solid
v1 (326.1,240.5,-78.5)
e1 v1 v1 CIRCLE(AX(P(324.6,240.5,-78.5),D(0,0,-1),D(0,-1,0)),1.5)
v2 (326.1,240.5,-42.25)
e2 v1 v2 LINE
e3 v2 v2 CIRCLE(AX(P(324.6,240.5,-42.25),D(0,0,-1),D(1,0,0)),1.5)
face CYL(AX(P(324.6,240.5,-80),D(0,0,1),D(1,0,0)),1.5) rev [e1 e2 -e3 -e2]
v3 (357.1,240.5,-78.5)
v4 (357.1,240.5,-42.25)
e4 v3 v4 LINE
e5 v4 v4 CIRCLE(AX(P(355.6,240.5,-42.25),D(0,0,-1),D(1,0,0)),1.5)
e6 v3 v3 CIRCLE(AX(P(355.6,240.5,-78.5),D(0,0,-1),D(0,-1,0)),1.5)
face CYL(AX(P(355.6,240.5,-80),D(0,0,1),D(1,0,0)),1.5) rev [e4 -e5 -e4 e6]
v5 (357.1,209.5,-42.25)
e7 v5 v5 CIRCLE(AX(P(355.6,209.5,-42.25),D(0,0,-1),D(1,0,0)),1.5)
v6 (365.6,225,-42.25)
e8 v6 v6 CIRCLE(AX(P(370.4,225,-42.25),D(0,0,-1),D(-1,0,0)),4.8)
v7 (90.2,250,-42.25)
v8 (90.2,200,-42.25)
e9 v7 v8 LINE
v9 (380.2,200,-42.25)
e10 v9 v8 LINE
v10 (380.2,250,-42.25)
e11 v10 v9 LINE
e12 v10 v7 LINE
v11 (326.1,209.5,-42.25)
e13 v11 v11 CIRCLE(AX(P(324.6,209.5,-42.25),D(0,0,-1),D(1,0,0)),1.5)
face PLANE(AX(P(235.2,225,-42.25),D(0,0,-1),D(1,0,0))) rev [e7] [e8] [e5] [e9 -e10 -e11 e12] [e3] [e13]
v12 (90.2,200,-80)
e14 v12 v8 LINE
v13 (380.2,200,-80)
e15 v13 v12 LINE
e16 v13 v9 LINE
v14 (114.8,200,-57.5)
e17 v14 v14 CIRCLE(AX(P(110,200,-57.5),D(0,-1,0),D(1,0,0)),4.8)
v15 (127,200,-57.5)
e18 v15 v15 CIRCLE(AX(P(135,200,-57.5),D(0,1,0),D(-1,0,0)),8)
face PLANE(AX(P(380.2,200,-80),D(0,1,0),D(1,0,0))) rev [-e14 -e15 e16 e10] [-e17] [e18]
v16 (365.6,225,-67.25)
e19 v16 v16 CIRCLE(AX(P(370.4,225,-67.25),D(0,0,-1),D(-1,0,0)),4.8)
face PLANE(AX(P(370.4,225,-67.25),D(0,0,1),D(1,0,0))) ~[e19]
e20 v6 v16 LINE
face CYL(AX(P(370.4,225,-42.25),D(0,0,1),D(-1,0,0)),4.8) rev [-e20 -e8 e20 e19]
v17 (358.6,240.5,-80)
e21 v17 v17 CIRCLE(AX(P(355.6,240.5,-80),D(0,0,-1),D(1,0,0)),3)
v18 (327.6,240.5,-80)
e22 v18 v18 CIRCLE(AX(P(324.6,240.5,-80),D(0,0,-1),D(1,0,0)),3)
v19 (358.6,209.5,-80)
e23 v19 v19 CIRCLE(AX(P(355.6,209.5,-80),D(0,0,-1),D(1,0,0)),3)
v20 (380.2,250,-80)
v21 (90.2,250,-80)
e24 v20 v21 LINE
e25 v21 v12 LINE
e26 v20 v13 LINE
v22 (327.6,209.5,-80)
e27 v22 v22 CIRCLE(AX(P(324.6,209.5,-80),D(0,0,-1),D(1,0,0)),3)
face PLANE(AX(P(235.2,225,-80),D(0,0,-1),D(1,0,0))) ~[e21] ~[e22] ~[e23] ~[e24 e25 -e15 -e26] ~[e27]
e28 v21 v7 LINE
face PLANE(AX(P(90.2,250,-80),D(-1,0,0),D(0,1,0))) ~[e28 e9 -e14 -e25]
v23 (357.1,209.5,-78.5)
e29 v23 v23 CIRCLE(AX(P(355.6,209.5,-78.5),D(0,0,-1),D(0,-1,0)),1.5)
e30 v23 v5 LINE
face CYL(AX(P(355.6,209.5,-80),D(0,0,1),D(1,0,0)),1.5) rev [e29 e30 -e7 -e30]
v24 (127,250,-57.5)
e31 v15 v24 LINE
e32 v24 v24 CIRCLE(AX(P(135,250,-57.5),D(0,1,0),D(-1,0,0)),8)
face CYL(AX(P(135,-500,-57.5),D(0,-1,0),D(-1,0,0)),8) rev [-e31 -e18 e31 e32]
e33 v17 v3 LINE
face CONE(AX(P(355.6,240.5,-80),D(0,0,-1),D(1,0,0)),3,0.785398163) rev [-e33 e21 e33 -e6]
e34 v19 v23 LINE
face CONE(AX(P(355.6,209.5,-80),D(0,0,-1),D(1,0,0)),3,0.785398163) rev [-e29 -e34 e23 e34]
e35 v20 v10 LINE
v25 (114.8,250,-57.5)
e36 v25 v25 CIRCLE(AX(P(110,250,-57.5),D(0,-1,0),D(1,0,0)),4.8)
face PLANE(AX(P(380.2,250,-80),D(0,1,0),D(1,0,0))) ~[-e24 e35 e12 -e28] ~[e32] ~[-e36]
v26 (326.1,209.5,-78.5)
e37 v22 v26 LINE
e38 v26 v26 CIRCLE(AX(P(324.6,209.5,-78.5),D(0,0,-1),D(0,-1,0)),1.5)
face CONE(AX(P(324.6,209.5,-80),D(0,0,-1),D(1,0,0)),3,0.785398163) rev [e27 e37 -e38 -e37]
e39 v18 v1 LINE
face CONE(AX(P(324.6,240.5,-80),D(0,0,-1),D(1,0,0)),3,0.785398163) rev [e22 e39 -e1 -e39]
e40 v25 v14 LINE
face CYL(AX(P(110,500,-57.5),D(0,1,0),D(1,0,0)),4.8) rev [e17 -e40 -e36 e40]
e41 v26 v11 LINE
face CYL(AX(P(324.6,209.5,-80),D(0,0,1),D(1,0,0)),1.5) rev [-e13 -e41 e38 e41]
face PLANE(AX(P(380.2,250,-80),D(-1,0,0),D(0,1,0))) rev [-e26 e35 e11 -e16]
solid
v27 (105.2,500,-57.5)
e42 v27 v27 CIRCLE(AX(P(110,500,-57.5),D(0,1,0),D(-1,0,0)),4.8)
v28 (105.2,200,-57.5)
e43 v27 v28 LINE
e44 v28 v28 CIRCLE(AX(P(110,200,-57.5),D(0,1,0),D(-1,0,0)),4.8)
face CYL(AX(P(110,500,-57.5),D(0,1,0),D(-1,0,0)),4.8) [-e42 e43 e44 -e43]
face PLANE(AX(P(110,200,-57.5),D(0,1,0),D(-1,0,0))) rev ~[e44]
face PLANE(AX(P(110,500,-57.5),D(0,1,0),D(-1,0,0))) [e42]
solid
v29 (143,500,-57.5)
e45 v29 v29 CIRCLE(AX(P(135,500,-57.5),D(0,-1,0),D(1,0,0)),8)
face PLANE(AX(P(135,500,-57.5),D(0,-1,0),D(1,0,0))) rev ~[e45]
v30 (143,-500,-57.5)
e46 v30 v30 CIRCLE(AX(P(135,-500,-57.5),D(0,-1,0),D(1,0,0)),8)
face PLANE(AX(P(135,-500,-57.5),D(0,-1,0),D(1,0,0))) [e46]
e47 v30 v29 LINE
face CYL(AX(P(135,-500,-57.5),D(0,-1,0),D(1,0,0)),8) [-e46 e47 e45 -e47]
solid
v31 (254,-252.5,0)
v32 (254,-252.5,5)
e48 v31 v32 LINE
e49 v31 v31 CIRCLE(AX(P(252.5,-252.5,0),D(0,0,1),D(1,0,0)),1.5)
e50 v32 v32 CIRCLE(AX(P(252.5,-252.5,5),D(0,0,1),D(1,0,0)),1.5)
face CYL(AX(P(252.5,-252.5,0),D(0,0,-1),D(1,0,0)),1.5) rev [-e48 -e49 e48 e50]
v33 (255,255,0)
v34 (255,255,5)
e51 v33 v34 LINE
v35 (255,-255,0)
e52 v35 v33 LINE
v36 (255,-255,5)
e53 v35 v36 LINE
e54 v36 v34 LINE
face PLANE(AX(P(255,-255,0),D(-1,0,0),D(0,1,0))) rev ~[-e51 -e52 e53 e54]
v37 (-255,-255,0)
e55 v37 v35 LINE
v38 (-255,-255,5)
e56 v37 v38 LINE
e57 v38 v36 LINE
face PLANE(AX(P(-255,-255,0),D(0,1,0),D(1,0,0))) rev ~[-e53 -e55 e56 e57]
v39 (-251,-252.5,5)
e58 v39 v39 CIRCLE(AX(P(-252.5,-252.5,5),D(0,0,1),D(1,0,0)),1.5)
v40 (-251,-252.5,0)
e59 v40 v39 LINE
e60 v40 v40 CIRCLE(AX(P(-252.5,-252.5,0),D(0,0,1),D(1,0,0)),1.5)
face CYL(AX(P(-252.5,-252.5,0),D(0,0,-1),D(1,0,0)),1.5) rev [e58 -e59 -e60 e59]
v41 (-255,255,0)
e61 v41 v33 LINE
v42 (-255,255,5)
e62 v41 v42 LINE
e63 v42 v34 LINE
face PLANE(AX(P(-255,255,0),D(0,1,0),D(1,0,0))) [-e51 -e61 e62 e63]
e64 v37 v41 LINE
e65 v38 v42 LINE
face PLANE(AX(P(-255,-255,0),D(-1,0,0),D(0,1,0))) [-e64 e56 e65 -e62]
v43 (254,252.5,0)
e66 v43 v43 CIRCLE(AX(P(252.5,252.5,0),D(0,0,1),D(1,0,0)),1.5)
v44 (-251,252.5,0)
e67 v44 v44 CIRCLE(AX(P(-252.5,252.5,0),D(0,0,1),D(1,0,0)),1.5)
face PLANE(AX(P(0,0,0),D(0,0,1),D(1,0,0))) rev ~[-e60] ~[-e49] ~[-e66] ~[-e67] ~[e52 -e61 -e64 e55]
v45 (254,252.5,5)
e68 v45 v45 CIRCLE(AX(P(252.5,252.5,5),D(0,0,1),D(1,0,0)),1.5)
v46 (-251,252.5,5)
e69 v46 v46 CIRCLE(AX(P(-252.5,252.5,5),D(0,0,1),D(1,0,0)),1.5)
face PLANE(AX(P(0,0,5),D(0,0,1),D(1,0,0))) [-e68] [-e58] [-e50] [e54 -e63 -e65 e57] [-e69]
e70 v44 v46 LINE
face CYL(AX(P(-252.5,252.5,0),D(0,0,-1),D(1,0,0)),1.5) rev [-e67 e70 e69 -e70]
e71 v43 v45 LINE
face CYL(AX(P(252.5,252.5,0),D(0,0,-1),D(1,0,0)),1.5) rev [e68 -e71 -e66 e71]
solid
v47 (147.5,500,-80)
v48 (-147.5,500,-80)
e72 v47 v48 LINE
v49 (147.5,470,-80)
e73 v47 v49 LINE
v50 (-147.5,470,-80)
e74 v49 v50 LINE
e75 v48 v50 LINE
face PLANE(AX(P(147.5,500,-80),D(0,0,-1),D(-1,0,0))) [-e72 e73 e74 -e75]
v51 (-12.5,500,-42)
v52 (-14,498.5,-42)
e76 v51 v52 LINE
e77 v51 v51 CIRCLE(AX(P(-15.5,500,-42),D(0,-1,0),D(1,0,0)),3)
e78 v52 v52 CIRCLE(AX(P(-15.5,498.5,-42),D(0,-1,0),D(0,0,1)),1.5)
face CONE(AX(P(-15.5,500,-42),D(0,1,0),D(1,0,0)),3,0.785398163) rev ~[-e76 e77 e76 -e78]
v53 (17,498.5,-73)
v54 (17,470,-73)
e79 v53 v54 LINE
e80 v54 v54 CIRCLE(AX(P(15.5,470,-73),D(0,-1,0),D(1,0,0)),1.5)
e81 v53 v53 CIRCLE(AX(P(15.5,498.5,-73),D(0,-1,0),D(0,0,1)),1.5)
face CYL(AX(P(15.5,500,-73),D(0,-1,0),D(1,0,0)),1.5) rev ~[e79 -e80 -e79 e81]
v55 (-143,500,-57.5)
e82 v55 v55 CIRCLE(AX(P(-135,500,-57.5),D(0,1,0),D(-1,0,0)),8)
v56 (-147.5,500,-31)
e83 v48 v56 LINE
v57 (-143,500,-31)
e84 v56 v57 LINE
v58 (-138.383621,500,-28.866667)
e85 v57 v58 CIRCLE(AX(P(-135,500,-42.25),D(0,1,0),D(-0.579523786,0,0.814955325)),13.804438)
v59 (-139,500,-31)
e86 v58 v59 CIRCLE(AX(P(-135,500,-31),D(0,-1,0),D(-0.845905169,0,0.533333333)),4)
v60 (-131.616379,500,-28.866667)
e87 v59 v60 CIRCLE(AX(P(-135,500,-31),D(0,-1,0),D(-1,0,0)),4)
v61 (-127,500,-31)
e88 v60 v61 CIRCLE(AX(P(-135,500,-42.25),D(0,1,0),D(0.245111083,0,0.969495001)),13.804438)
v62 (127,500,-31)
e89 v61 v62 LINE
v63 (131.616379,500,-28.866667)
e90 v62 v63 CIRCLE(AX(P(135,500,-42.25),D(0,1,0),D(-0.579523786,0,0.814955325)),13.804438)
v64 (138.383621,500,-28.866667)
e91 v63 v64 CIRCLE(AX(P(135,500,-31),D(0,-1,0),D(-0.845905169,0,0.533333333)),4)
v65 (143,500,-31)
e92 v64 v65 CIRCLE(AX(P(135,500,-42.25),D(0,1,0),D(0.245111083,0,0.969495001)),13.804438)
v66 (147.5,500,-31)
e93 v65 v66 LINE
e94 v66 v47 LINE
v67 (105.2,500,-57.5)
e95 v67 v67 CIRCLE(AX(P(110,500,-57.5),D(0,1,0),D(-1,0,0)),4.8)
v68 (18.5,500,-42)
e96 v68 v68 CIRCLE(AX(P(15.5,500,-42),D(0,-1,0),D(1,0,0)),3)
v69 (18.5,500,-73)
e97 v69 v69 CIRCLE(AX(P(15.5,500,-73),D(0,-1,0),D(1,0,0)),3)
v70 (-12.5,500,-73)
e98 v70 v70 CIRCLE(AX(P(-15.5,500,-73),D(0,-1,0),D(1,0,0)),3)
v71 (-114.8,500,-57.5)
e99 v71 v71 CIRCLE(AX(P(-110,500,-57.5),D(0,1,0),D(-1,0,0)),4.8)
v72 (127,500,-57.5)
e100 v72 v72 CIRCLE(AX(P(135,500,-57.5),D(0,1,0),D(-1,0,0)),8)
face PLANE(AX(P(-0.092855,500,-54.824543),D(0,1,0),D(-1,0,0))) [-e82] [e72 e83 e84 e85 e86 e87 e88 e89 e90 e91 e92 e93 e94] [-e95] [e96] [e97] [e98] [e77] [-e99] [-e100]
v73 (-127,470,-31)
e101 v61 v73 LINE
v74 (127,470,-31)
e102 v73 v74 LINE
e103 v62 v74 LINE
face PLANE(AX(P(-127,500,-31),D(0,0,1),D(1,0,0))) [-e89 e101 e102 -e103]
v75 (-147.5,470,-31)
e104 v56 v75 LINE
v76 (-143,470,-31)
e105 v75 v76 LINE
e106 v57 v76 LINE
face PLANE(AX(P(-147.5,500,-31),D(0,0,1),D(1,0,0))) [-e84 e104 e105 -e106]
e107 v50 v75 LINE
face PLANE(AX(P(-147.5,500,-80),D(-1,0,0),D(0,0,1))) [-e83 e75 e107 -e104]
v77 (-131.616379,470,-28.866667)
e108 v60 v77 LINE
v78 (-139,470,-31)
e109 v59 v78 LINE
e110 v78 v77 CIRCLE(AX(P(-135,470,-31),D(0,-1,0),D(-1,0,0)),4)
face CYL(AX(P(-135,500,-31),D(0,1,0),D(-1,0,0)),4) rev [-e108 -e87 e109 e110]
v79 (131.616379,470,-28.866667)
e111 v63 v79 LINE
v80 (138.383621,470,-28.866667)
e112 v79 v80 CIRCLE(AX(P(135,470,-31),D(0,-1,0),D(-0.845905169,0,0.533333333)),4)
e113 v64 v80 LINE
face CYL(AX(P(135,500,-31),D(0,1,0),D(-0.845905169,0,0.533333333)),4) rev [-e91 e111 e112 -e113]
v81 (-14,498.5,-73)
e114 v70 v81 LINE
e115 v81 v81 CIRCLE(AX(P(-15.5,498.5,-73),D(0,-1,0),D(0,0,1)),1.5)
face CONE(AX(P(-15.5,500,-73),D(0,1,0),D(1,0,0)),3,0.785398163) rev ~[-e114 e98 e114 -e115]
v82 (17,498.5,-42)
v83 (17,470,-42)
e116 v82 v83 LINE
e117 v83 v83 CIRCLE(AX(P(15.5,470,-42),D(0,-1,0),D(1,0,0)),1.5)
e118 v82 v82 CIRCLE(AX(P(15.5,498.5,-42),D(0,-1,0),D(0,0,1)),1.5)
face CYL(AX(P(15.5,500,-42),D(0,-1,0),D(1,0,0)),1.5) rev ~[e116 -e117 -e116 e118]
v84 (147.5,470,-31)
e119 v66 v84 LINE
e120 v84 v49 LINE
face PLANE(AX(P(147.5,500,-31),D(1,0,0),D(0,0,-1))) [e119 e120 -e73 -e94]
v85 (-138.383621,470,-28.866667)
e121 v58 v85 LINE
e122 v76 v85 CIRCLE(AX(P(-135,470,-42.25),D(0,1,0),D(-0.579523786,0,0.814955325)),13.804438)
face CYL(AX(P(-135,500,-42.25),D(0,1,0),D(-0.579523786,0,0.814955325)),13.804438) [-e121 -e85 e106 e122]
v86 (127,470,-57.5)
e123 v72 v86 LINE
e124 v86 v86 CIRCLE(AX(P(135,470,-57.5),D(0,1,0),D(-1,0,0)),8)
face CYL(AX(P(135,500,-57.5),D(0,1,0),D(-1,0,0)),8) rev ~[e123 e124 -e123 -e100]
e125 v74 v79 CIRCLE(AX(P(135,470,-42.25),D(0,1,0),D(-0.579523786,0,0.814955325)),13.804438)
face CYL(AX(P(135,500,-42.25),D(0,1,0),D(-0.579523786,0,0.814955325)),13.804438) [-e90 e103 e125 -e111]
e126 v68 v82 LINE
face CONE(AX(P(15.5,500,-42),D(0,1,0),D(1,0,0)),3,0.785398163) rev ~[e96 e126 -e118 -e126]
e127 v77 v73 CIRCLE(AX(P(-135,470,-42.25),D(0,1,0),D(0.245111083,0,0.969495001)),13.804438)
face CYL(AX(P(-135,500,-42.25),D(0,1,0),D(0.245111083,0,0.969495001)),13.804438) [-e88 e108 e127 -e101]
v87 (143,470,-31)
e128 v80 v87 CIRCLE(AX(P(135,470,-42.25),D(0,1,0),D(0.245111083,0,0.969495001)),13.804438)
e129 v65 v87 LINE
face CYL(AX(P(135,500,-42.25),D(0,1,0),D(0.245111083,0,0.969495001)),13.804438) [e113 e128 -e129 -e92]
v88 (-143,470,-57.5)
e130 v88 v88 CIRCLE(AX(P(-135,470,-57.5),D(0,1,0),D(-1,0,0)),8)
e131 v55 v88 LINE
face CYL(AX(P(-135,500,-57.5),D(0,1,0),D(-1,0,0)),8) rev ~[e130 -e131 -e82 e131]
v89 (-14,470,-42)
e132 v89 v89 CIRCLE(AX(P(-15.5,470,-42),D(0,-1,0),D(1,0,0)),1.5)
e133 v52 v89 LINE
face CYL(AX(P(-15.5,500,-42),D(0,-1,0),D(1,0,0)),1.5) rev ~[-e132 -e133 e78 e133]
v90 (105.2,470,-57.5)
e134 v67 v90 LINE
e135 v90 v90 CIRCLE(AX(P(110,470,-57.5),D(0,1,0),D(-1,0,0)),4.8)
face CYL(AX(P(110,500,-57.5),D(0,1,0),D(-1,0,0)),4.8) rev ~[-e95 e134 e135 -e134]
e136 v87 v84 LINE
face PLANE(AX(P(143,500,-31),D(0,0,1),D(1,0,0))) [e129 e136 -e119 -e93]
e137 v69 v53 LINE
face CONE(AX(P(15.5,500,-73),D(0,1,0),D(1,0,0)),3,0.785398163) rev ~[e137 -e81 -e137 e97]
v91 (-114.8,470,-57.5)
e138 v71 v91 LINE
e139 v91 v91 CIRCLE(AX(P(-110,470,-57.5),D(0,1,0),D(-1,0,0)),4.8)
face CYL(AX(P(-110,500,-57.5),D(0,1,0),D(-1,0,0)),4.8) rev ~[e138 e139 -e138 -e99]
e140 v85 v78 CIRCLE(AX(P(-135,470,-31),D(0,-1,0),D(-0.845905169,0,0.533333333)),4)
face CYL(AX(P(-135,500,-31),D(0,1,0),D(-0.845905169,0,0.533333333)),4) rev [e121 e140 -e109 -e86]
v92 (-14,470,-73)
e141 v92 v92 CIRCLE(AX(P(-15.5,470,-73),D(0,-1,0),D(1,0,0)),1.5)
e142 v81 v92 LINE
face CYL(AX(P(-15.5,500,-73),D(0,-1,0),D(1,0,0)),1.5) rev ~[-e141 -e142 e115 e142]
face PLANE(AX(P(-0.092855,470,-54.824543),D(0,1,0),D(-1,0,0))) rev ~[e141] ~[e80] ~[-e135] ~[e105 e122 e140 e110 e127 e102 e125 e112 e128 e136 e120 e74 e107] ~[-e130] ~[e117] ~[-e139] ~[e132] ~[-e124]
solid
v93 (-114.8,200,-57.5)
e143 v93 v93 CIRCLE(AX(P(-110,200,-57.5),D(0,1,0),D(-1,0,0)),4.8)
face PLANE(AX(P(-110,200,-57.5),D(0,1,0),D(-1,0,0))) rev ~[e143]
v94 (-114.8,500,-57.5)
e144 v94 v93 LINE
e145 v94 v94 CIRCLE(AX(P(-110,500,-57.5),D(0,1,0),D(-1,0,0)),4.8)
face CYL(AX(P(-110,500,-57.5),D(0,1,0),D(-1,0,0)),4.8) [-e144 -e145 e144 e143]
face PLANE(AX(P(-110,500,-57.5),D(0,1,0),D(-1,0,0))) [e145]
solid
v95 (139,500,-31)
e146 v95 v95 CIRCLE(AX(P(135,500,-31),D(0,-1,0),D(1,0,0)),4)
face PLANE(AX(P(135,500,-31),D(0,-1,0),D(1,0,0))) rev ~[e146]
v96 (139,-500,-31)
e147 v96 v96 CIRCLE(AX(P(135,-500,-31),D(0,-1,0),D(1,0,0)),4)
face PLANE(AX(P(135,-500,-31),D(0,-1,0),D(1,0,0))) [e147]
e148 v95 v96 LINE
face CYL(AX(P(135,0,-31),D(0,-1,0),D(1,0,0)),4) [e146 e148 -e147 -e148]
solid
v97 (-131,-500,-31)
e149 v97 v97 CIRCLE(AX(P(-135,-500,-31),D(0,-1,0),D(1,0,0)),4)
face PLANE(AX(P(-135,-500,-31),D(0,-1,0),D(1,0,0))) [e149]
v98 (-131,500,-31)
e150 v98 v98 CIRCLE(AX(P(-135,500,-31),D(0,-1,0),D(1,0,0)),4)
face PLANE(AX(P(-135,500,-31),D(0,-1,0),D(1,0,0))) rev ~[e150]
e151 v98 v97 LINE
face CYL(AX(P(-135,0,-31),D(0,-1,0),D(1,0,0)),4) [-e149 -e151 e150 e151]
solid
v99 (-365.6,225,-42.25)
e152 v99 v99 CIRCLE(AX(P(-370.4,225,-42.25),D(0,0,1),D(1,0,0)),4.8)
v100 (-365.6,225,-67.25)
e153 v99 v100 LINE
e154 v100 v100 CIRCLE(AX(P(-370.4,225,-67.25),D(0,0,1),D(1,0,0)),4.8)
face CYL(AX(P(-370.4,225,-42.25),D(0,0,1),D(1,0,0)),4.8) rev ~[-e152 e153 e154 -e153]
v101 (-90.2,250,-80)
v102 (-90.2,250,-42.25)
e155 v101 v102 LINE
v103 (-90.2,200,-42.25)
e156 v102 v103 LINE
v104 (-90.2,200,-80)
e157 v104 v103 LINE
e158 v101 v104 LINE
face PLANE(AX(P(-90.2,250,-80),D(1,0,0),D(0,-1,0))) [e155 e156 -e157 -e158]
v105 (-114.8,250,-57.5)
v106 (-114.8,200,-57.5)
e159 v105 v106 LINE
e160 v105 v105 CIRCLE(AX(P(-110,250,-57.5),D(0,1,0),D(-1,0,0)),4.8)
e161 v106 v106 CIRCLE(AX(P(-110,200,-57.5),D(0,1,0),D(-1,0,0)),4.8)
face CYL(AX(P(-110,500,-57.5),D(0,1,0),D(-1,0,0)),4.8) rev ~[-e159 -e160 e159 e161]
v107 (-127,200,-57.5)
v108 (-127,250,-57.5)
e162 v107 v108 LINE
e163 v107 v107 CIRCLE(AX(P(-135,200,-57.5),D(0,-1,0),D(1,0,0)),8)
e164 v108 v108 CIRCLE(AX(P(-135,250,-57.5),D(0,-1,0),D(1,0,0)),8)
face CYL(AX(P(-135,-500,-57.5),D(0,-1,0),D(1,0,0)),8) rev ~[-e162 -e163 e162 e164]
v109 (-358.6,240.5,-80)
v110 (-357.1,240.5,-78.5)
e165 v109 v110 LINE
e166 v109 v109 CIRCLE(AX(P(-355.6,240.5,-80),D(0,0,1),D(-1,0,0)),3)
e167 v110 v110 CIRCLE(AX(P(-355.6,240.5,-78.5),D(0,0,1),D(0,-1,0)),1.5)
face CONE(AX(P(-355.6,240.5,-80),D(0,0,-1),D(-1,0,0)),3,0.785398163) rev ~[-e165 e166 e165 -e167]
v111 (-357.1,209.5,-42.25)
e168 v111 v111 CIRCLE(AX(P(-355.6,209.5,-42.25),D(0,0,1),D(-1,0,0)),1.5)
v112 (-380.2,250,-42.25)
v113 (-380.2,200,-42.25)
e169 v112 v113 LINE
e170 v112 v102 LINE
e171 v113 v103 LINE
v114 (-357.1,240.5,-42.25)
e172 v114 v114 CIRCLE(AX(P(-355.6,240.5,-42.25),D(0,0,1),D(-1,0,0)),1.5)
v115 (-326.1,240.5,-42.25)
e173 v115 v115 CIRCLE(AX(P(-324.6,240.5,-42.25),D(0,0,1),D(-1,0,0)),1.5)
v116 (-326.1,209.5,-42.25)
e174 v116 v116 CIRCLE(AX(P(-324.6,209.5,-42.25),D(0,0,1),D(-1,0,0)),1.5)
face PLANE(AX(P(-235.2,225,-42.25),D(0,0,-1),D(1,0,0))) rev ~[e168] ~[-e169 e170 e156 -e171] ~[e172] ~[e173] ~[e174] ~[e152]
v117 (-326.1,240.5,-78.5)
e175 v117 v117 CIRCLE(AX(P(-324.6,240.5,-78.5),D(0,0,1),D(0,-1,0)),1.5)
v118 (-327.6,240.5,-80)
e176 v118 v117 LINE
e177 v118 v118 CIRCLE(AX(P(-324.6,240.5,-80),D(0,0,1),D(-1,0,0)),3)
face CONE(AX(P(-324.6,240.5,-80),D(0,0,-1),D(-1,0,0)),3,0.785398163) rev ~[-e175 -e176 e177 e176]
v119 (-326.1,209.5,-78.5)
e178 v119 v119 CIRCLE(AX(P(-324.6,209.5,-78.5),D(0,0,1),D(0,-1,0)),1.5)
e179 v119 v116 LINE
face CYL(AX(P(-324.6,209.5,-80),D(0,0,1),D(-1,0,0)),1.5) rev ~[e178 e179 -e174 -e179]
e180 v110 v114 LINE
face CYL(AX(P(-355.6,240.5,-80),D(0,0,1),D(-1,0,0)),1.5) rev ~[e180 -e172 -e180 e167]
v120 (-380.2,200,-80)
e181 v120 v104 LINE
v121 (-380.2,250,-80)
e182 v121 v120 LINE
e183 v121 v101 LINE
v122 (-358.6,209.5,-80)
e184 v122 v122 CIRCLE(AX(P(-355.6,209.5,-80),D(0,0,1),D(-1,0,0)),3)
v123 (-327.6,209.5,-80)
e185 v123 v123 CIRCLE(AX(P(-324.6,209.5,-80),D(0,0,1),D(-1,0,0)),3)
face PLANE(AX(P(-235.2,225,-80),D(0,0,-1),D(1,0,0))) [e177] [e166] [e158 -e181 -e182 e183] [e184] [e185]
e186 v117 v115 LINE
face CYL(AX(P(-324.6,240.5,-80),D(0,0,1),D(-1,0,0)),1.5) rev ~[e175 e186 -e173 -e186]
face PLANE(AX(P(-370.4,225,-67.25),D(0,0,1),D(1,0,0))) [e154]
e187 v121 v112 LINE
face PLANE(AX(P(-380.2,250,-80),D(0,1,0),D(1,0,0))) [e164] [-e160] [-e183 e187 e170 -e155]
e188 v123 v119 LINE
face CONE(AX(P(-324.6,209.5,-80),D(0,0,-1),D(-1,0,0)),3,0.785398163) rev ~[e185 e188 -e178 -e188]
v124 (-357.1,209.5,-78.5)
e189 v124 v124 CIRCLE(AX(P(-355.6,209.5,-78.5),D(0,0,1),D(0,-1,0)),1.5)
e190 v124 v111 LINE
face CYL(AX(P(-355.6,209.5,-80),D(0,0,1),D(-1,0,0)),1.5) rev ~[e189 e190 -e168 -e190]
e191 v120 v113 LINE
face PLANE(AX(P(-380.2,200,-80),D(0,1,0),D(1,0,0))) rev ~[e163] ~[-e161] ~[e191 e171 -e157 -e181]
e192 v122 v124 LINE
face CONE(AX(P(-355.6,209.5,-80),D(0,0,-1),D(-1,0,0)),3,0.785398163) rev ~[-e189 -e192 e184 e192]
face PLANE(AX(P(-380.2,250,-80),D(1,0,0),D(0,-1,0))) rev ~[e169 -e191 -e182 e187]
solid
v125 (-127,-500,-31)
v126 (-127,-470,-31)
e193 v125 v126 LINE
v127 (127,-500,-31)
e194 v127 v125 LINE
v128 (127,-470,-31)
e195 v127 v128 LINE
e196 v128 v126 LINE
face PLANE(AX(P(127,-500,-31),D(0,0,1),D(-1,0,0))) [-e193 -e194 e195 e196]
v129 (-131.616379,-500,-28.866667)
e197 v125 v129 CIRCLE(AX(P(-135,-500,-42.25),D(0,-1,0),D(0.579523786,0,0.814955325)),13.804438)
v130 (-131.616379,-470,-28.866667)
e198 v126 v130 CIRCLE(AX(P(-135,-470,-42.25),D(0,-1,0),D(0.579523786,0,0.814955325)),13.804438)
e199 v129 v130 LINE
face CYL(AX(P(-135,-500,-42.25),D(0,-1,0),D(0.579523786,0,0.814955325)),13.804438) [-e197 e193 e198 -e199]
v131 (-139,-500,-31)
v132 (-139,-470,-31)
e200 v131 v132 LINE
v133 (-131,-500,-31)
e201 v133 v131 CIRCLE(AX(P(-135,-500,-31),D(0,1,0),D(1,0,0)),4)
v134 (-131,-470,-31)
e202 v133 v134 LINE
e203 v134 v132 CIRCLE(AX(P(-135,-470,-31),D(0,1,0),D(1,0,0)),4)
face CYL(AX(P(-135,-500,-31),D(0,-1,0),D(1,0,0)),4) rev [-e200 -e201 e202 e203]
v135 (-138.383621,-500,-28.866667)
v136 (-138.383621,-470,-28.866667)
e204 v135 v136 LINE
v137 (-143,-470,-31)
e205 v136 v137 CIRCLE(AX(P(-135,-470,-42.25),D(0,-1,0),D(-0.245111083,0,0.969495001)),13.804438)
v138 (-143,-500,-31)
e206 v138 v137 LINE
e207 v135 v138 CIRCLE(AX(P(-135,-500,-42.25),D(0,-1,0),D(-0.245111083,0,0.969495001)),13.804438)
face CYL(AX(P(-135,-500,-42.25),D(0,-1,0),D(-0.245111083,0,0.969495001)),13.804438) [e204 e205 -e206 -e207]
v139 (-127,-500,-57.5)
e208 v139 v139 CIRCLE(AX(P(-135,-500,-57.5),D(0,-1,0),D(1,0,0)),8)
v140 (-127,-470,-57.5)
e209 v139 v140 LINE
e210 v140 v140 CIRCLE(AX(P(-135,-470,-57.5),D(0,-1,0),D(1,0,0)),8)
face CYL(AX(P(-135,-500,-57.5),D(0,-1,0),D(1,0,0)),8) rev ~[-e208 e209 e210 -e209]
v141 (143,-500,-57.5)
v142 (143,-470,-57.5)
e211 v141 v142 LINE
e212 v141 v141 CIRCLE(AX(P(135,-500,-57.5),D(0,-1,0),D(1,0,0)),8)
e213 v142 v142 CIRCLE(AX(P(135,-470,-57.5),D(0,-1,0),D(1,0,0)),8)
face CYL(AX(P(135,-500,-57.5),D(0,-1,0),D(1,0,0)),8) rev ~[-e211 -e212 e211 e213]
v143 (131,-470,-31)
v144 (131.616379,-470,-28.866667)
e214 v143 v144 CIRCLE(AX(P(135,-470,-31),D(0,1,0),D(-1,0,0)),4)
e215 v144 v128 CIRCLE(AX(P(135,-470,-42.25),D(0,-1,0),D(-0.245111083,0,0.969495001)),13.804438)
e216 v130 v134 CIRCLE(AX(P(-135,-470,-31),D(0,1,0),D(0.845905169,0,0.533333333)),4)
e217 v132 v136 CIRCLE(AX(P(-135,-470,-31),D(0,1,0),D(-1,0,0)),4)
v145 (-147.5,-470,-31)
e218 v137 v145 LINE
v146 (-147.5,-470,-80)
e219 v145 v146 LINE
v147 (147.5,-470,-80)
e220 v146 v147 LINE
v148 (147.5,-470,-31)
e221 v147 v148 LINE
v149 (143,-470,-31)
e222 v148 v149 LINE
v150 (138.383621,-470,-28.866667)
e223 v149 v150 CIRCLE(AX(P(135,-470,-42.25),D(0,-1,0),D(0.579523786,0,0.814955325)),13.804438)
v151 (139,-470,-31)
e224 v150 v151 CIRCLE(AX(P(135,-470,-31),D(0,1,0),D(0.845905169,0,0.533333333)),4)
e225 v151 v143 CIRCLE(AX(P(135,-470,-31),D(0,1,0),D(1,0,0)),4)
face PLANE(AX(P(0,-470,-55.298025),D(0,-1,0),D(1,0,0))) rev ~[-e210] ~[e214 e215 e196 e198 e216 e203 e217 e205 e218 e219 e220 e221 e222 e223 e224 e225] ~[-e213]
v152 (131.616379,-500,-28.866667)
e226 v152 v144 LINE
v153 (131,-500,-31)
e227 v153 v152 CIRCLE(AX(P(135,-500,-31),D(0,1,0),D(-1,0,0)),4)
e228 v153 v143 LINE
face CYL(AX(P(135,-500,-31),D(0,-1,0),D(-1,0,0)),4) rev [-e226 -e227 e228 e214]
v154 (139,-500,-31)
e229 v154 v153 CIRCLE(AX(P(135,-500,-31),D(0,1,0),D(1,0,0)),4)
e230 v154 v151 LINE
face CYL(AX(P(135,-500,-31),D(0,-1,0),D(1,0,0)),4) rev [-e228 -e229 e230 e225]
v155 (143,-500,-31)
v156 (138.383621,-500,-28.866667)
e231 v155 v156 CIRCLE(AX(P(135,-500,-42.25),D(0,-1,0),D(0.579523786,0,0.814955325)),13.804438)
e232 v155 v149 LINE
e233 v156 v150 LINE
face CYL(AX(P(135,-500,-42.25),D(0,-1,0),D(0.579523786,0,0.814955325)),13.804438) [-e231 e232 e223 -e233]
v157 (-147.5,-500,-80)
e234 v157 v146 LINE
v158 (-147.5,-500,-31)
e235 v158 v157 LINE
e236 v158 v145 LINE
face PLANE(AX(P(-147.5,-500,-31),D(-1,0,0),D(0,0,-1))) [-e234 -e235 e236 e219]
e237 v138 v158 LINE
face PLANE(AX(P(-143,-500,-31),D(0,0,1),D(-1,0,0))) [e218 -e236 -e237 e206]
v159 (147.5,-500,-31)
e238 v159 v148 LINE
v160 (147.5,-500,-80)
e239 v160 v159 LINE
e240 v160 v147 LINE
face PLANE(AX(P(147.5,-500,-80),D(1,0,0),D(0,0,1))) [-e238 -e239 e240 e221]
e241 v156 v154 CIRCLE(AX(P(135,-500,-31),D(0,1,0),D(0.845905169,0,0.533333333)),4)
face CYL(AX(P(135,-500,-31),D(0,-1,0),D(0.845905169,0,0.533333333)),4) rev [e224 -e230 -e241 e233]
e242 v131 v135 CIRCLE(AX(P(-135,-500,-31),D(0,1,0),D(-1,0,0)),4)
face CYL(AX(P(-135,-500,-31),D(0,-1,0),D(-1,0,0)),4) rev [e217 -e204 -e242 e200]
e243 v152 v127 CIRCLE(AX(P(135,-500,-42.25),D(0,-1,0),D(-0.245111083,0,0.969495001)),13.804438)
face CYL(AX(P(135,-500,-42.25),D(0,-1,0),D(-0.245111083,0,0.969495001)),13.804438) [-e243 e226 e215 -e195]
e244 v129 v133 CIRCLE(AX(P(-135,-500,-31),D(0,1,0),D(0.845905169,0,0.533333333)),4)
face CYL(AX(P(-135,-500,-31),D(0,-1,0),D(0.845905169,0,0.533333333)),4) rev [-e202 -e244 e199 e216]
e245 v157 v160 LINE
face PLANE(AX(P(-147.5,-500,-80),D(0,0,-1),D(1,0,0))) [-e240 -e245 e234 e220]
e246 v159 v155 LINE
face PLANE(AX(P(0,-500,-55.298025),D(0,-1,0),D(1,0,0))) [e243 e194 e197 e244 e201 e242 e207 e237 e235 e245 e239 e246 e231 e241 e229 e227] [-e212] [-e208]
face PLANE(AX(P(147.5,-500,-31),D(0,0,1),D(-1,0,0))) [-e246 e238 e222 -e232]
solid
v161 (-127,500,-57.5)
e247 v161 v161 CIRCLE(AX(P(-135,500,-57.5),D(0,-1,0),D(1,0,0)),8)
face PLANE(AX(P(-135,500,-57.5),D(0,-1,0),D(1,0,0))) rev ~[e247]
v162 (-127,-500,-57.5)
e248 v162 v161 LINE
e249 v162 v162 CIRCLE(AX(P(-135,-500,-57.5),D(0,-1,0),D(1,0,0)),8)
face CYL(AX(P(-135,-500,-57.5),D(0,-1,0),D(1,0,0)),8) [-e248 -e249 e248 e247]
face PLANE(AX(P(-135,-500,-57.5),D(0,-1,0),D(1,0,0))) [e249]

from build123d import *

# Parameters (mm, degrees)
F0_W            = 510
F0_H            = 510
F0_R            = 1.5
F1_DEPTH        = 5
F4_R            = 4
F5_DEPTH        = 500
F6_R            = 8
F7_DEPTH        = 1000
F8_DEPTH        = 30
F9_R            = 8
F9_R_2          = 4.8
F10_DEPTH       = 30
F11_DEPTH       = 300
F12_W           = 290
F12_H           = 50
F13_DEPTH       = 37.75
F14_R           = 4.8
F15_DEPTH       = 25
F18_D           = 3
F18_CSINK_D     = 6
F18_CSINK_ANGLE = 90
F19_D           = 3
F19_CSINK_D     = 6
F19_CSINK_ANGLE = 90


# Not quite as in the source:
# - a feature names something its author has since deleted; it is built from what else it names


with BuildPart() as f1:
    # F0 (on Top) → F1 (new body)
    with BuildSketch(Plane.XY):
        Rectangle(F0_W, F0_H)
        with Locations((-252.5, -252.5)):
            Circle(F0_R, mode=Mode.SUBTRACT)
        with Locations((252.5, -252.5)):
            Circle(F0_R, mode=Mode.SUBTRACT)
        with Locations((-252.5, 252.5)):
            Circle(F0_R, mode=Mode.SUBTRACT)
        with Locations((252.5, 252.5)):
            Circle(F0_R, mode=Mode.SUBTRACT)
    extrude(amount=F1_DEPTH)


with BuildPart() as f5:
    # F4 (on Front) → F5 (new body, symmetric)
    with BuildSketch(Plane.XZ):
        with Locations((-135, -31)):
            Circle(F4_R)
    extrude(amount=F5_DEPTH, both=True)


with BuildPart() as f5b:
    # F4 (on Front) → F5, piece 2 (new body, symmetric)
    with BuildSketch(Plane.XZ):
        with Locations((135, -31)):
            Circle(F4_R)
    extrude(amount=F5_DEPTH, both=True)


with BuildPart() as f7:
    # F6 (on face) → F7 (new body, through all)
    with BuildSketch(Plane.XZ.offset(500)):
        with Locations((135, -57.5)):
            Circle(F6_R)
    extrude(amount=-F7_DEPTH)


with BuildPart() as f7b:
    # F6 (on face) → F7, piece 2 (new body, through all)
    with BuildSketch(Plane.XZ.offset(500)):
        with Locations((-135, -57.5)):
            Circle(F6_R)
    extrude(amount=-F7_DEPTH)


with BuildPart() as f8:
    # F6 (on face) → F8 (new body)
    with BuildSketch(Plane.XZ.offset(500)):
        with BuildLine():
            Line((-127, -31), (-131, -31))
            ThreePointArc((-131, -31), (-135, -35), (-139, -31))
            Line((-139, -31), (-143, -31))
            Line((-143, -31), (-147.5, -31))
            Line((-147.5, -31), (-147.5, -80))
            Line((-147.5, -80), (147.5, -80))
            Line((147.5, -80), (147.5, -31))
            Line((147.5, -31), (143, -31))
            Line((143, -31), (139, -31))
            ThreePointArc((139, -31), (135, -35), (131, -31))
            Line((131, -31), (127, -31))
            Line((127, -31), (-127, -31))
        make_face()
        with Locations((-135, -57.5)):
            Circle(F6_R, mode=Mode.SUBTRACT)
        with Locations((135, -57.5)):
            Circle(F6_R, mode=Mode.SUBTRACT)
        with BuildLine():
            Line((-143, -31), (-139, -31))
            ThreePointArc((-139, -31), (-138.8428168516, -29.8897033527), (-138.3836206775, -28.8666666667))
            ThreePointArc((-138.3836206775, -28.8666666667), (-140.7908965377, -29.7189179521), (-143, -31))
        make_face()
        with BuildLine():
            ThreePointArc((-131.6163793225, -28.8666666667), (-131.1571831484, -29.8897033527), (-131, -31))
            Line((-131, -31), (-127, -31))
            ThreePointArc((-127, -31), (-129.2091034623, -29.7189179521), (-131.6163793225, -28.8666666667))
        make_face()
        with BuildLine():
            ThreePointArc((131.6163793225, -28.8666666667), (129.2091034623, -29.7189179521), (127, -31))
            Line((127, -31), (131, -31))
            ThreePointArc((131, -31), (131.1571831484, -29.8897033527), (131.6163793225, -28.8666666667))
        make_face()
        with BuildLine():
            ThreePointArc((138.3836206775, -28.8666666667), (138.8428168516, -29.8897033527), (139, -31))
            Line((139, -31), (143, -31))
            ThreePointArc((143, -31), (140.7908965377, -29.7189179521), (138.3836206775, -28.8666666667))
        make_face()
    extrude(amount=-F8_DEPTH)


with BuildPart() as f10:
    # F9 (on face) → F10 (new body)
    with BuildSketch(Plane(origin=(0, 500, 0), x_dir=(-1, 0, 0), z_dir=(0, 1, 0))):
        with BuildLine():
            ThreePointArc((-131.6163793225, -28.8666666667), (-135, -35), (-138.3836206775, -28.8666666667))
            ThreePointArc((-138.3836206775, -28.8666666667), (-140.7908965377, -29.7189179521), (-143, -31))
            Line((-143, -31), (-147.5, -31))
            Line((-147.5, -31), (-147.5, -80))
            Line((-147.5, -80), (147.5, -80))
            Line((147.5, -80), (147.5, -31))
            Line((147.5, -31), (143, -31))
            ThreePointArc((143, -31), (140.7908965377, -29.7189179521), (138.3836206775, -28.8666666667))
            ThreePointArc((138.3836206775, -28.8666666667), (138.8428168516, -29.8897033527), (139, -31))
            ThreePointArc((139, -31), (133.8897033527, -34.8428168516), (131.6163793225, -28.8666666667))
            ThreePointArc((131.6163793225, -28.8666666667), (129.2091034623, -29.7189179521), (127, -31))
            Line((127, -31), (-127, -31))
            ThreePointArc((-127, -31), (-129.2091034623, -29.7189179521), (-131.6163793225, -28.8666666667))
        make_face()
        with Locations((-135, -57.5)):
            Circle(F9_R, mode=Mode.SUBTRACT)
        with Locations((-110, -57.5)):
            Circle(F9_R_2, mode=Mode.SUBTRACT)
        with Locations((110, -57.5)):
            Circle(F9_R_2, mode=Mode.SUBTRACT)
        with Locations((135, -57.5)):
            Circle(F9_R, mode=Mode.SUBTRACT)
    extrude(amount=-F10_DEPTH)

    # F19 (through all)
    with Locations(Plane(origin=(0, 500, 0), x_dir=(-1, 0, 0), z_dir=(0, 1, 0))):
        with Locations((-15.5, -42), (15.5, -42), (15.5, -73), (-15.5, -73)):
            CounterSinkHole(F19_D / 2, F19_CSINK_D / 2, counter_sink_angle=F19_CSINK_ANGLE)


with BuildPart() as f11:
    # F9 (on face) → F11 (new body)
    with BuildSketch(Plane(origin=(0, 500, 0), x_dir=(-1, 0, 0), z_dir=(0, 1, 0))):
        with Locations((-110, -57.5)):
            Circle(F9_R_2)
    extrude(amount=-F11_DEPTH)


with BuildPart() as f11b:
    # F9 (on face) → F11, piece 2 (new body)
    with BuildSketch(Plane(origin=(0, 500, 0), x_dir=(-1, 0, 0), z_dir=(0, 1, 0))):
        with Locations((110, -57.5)):
            Circle(F9_R_2)
    extrude(amount=-F11_DEPTH)


with BuildPart() as f13:
    # F12 (on face) → F13 (new body, through all)
    with BuildSketch(Plane(origin=(0, 0, -80), x_dir=(1, 0, 0), z_dir=(0, 0, -1))):
        with Locations((-235.2, -225)):
            Rectangle(F12_W, F12_H)
    extrude(amount=-F13_DEPTH)

    # F14 (on face) → F15 (cut)
    with BuildSketch(Plane.XY.offset(-42.25)):
        with Locations((-370.4, 225)):
            Circle(F14_R)
    extrude(amount=-F15_DEPTH, mode=Mode.SUBTRACT)

    # F17: cut F11b, F7b
    add(f11b.part, mode=Mode.SUBTRACT)
    add(f7b.part, mode=Mode.SUBTRACT)

    # F18 (through all)
    with Locations(Plane(origin=(0, 0, -80), x_dir=(1, 0, 0), z_dir=(0, 0, -1))):
        with Locations((-324.6, -240.5), (-355.6, -240.5), (-355.6, -209.5), (-324.6, -209.5)):
            CounterSinkHole(F18_D / 2, F18_CSINK_D / 2, counter_sink_angle=F18_CSINK_ANGLE)


with BuildPart() as f20_1:
    # F20: instance of F13
    add(f13.part.mirror(Plane.YZ))


solid = Compound([f1.part, f5.part, f5b.part, f7.part, f7b.part, f8.part, f10.part, f11.part, f11b.part, f13.part, f20_1.part])
